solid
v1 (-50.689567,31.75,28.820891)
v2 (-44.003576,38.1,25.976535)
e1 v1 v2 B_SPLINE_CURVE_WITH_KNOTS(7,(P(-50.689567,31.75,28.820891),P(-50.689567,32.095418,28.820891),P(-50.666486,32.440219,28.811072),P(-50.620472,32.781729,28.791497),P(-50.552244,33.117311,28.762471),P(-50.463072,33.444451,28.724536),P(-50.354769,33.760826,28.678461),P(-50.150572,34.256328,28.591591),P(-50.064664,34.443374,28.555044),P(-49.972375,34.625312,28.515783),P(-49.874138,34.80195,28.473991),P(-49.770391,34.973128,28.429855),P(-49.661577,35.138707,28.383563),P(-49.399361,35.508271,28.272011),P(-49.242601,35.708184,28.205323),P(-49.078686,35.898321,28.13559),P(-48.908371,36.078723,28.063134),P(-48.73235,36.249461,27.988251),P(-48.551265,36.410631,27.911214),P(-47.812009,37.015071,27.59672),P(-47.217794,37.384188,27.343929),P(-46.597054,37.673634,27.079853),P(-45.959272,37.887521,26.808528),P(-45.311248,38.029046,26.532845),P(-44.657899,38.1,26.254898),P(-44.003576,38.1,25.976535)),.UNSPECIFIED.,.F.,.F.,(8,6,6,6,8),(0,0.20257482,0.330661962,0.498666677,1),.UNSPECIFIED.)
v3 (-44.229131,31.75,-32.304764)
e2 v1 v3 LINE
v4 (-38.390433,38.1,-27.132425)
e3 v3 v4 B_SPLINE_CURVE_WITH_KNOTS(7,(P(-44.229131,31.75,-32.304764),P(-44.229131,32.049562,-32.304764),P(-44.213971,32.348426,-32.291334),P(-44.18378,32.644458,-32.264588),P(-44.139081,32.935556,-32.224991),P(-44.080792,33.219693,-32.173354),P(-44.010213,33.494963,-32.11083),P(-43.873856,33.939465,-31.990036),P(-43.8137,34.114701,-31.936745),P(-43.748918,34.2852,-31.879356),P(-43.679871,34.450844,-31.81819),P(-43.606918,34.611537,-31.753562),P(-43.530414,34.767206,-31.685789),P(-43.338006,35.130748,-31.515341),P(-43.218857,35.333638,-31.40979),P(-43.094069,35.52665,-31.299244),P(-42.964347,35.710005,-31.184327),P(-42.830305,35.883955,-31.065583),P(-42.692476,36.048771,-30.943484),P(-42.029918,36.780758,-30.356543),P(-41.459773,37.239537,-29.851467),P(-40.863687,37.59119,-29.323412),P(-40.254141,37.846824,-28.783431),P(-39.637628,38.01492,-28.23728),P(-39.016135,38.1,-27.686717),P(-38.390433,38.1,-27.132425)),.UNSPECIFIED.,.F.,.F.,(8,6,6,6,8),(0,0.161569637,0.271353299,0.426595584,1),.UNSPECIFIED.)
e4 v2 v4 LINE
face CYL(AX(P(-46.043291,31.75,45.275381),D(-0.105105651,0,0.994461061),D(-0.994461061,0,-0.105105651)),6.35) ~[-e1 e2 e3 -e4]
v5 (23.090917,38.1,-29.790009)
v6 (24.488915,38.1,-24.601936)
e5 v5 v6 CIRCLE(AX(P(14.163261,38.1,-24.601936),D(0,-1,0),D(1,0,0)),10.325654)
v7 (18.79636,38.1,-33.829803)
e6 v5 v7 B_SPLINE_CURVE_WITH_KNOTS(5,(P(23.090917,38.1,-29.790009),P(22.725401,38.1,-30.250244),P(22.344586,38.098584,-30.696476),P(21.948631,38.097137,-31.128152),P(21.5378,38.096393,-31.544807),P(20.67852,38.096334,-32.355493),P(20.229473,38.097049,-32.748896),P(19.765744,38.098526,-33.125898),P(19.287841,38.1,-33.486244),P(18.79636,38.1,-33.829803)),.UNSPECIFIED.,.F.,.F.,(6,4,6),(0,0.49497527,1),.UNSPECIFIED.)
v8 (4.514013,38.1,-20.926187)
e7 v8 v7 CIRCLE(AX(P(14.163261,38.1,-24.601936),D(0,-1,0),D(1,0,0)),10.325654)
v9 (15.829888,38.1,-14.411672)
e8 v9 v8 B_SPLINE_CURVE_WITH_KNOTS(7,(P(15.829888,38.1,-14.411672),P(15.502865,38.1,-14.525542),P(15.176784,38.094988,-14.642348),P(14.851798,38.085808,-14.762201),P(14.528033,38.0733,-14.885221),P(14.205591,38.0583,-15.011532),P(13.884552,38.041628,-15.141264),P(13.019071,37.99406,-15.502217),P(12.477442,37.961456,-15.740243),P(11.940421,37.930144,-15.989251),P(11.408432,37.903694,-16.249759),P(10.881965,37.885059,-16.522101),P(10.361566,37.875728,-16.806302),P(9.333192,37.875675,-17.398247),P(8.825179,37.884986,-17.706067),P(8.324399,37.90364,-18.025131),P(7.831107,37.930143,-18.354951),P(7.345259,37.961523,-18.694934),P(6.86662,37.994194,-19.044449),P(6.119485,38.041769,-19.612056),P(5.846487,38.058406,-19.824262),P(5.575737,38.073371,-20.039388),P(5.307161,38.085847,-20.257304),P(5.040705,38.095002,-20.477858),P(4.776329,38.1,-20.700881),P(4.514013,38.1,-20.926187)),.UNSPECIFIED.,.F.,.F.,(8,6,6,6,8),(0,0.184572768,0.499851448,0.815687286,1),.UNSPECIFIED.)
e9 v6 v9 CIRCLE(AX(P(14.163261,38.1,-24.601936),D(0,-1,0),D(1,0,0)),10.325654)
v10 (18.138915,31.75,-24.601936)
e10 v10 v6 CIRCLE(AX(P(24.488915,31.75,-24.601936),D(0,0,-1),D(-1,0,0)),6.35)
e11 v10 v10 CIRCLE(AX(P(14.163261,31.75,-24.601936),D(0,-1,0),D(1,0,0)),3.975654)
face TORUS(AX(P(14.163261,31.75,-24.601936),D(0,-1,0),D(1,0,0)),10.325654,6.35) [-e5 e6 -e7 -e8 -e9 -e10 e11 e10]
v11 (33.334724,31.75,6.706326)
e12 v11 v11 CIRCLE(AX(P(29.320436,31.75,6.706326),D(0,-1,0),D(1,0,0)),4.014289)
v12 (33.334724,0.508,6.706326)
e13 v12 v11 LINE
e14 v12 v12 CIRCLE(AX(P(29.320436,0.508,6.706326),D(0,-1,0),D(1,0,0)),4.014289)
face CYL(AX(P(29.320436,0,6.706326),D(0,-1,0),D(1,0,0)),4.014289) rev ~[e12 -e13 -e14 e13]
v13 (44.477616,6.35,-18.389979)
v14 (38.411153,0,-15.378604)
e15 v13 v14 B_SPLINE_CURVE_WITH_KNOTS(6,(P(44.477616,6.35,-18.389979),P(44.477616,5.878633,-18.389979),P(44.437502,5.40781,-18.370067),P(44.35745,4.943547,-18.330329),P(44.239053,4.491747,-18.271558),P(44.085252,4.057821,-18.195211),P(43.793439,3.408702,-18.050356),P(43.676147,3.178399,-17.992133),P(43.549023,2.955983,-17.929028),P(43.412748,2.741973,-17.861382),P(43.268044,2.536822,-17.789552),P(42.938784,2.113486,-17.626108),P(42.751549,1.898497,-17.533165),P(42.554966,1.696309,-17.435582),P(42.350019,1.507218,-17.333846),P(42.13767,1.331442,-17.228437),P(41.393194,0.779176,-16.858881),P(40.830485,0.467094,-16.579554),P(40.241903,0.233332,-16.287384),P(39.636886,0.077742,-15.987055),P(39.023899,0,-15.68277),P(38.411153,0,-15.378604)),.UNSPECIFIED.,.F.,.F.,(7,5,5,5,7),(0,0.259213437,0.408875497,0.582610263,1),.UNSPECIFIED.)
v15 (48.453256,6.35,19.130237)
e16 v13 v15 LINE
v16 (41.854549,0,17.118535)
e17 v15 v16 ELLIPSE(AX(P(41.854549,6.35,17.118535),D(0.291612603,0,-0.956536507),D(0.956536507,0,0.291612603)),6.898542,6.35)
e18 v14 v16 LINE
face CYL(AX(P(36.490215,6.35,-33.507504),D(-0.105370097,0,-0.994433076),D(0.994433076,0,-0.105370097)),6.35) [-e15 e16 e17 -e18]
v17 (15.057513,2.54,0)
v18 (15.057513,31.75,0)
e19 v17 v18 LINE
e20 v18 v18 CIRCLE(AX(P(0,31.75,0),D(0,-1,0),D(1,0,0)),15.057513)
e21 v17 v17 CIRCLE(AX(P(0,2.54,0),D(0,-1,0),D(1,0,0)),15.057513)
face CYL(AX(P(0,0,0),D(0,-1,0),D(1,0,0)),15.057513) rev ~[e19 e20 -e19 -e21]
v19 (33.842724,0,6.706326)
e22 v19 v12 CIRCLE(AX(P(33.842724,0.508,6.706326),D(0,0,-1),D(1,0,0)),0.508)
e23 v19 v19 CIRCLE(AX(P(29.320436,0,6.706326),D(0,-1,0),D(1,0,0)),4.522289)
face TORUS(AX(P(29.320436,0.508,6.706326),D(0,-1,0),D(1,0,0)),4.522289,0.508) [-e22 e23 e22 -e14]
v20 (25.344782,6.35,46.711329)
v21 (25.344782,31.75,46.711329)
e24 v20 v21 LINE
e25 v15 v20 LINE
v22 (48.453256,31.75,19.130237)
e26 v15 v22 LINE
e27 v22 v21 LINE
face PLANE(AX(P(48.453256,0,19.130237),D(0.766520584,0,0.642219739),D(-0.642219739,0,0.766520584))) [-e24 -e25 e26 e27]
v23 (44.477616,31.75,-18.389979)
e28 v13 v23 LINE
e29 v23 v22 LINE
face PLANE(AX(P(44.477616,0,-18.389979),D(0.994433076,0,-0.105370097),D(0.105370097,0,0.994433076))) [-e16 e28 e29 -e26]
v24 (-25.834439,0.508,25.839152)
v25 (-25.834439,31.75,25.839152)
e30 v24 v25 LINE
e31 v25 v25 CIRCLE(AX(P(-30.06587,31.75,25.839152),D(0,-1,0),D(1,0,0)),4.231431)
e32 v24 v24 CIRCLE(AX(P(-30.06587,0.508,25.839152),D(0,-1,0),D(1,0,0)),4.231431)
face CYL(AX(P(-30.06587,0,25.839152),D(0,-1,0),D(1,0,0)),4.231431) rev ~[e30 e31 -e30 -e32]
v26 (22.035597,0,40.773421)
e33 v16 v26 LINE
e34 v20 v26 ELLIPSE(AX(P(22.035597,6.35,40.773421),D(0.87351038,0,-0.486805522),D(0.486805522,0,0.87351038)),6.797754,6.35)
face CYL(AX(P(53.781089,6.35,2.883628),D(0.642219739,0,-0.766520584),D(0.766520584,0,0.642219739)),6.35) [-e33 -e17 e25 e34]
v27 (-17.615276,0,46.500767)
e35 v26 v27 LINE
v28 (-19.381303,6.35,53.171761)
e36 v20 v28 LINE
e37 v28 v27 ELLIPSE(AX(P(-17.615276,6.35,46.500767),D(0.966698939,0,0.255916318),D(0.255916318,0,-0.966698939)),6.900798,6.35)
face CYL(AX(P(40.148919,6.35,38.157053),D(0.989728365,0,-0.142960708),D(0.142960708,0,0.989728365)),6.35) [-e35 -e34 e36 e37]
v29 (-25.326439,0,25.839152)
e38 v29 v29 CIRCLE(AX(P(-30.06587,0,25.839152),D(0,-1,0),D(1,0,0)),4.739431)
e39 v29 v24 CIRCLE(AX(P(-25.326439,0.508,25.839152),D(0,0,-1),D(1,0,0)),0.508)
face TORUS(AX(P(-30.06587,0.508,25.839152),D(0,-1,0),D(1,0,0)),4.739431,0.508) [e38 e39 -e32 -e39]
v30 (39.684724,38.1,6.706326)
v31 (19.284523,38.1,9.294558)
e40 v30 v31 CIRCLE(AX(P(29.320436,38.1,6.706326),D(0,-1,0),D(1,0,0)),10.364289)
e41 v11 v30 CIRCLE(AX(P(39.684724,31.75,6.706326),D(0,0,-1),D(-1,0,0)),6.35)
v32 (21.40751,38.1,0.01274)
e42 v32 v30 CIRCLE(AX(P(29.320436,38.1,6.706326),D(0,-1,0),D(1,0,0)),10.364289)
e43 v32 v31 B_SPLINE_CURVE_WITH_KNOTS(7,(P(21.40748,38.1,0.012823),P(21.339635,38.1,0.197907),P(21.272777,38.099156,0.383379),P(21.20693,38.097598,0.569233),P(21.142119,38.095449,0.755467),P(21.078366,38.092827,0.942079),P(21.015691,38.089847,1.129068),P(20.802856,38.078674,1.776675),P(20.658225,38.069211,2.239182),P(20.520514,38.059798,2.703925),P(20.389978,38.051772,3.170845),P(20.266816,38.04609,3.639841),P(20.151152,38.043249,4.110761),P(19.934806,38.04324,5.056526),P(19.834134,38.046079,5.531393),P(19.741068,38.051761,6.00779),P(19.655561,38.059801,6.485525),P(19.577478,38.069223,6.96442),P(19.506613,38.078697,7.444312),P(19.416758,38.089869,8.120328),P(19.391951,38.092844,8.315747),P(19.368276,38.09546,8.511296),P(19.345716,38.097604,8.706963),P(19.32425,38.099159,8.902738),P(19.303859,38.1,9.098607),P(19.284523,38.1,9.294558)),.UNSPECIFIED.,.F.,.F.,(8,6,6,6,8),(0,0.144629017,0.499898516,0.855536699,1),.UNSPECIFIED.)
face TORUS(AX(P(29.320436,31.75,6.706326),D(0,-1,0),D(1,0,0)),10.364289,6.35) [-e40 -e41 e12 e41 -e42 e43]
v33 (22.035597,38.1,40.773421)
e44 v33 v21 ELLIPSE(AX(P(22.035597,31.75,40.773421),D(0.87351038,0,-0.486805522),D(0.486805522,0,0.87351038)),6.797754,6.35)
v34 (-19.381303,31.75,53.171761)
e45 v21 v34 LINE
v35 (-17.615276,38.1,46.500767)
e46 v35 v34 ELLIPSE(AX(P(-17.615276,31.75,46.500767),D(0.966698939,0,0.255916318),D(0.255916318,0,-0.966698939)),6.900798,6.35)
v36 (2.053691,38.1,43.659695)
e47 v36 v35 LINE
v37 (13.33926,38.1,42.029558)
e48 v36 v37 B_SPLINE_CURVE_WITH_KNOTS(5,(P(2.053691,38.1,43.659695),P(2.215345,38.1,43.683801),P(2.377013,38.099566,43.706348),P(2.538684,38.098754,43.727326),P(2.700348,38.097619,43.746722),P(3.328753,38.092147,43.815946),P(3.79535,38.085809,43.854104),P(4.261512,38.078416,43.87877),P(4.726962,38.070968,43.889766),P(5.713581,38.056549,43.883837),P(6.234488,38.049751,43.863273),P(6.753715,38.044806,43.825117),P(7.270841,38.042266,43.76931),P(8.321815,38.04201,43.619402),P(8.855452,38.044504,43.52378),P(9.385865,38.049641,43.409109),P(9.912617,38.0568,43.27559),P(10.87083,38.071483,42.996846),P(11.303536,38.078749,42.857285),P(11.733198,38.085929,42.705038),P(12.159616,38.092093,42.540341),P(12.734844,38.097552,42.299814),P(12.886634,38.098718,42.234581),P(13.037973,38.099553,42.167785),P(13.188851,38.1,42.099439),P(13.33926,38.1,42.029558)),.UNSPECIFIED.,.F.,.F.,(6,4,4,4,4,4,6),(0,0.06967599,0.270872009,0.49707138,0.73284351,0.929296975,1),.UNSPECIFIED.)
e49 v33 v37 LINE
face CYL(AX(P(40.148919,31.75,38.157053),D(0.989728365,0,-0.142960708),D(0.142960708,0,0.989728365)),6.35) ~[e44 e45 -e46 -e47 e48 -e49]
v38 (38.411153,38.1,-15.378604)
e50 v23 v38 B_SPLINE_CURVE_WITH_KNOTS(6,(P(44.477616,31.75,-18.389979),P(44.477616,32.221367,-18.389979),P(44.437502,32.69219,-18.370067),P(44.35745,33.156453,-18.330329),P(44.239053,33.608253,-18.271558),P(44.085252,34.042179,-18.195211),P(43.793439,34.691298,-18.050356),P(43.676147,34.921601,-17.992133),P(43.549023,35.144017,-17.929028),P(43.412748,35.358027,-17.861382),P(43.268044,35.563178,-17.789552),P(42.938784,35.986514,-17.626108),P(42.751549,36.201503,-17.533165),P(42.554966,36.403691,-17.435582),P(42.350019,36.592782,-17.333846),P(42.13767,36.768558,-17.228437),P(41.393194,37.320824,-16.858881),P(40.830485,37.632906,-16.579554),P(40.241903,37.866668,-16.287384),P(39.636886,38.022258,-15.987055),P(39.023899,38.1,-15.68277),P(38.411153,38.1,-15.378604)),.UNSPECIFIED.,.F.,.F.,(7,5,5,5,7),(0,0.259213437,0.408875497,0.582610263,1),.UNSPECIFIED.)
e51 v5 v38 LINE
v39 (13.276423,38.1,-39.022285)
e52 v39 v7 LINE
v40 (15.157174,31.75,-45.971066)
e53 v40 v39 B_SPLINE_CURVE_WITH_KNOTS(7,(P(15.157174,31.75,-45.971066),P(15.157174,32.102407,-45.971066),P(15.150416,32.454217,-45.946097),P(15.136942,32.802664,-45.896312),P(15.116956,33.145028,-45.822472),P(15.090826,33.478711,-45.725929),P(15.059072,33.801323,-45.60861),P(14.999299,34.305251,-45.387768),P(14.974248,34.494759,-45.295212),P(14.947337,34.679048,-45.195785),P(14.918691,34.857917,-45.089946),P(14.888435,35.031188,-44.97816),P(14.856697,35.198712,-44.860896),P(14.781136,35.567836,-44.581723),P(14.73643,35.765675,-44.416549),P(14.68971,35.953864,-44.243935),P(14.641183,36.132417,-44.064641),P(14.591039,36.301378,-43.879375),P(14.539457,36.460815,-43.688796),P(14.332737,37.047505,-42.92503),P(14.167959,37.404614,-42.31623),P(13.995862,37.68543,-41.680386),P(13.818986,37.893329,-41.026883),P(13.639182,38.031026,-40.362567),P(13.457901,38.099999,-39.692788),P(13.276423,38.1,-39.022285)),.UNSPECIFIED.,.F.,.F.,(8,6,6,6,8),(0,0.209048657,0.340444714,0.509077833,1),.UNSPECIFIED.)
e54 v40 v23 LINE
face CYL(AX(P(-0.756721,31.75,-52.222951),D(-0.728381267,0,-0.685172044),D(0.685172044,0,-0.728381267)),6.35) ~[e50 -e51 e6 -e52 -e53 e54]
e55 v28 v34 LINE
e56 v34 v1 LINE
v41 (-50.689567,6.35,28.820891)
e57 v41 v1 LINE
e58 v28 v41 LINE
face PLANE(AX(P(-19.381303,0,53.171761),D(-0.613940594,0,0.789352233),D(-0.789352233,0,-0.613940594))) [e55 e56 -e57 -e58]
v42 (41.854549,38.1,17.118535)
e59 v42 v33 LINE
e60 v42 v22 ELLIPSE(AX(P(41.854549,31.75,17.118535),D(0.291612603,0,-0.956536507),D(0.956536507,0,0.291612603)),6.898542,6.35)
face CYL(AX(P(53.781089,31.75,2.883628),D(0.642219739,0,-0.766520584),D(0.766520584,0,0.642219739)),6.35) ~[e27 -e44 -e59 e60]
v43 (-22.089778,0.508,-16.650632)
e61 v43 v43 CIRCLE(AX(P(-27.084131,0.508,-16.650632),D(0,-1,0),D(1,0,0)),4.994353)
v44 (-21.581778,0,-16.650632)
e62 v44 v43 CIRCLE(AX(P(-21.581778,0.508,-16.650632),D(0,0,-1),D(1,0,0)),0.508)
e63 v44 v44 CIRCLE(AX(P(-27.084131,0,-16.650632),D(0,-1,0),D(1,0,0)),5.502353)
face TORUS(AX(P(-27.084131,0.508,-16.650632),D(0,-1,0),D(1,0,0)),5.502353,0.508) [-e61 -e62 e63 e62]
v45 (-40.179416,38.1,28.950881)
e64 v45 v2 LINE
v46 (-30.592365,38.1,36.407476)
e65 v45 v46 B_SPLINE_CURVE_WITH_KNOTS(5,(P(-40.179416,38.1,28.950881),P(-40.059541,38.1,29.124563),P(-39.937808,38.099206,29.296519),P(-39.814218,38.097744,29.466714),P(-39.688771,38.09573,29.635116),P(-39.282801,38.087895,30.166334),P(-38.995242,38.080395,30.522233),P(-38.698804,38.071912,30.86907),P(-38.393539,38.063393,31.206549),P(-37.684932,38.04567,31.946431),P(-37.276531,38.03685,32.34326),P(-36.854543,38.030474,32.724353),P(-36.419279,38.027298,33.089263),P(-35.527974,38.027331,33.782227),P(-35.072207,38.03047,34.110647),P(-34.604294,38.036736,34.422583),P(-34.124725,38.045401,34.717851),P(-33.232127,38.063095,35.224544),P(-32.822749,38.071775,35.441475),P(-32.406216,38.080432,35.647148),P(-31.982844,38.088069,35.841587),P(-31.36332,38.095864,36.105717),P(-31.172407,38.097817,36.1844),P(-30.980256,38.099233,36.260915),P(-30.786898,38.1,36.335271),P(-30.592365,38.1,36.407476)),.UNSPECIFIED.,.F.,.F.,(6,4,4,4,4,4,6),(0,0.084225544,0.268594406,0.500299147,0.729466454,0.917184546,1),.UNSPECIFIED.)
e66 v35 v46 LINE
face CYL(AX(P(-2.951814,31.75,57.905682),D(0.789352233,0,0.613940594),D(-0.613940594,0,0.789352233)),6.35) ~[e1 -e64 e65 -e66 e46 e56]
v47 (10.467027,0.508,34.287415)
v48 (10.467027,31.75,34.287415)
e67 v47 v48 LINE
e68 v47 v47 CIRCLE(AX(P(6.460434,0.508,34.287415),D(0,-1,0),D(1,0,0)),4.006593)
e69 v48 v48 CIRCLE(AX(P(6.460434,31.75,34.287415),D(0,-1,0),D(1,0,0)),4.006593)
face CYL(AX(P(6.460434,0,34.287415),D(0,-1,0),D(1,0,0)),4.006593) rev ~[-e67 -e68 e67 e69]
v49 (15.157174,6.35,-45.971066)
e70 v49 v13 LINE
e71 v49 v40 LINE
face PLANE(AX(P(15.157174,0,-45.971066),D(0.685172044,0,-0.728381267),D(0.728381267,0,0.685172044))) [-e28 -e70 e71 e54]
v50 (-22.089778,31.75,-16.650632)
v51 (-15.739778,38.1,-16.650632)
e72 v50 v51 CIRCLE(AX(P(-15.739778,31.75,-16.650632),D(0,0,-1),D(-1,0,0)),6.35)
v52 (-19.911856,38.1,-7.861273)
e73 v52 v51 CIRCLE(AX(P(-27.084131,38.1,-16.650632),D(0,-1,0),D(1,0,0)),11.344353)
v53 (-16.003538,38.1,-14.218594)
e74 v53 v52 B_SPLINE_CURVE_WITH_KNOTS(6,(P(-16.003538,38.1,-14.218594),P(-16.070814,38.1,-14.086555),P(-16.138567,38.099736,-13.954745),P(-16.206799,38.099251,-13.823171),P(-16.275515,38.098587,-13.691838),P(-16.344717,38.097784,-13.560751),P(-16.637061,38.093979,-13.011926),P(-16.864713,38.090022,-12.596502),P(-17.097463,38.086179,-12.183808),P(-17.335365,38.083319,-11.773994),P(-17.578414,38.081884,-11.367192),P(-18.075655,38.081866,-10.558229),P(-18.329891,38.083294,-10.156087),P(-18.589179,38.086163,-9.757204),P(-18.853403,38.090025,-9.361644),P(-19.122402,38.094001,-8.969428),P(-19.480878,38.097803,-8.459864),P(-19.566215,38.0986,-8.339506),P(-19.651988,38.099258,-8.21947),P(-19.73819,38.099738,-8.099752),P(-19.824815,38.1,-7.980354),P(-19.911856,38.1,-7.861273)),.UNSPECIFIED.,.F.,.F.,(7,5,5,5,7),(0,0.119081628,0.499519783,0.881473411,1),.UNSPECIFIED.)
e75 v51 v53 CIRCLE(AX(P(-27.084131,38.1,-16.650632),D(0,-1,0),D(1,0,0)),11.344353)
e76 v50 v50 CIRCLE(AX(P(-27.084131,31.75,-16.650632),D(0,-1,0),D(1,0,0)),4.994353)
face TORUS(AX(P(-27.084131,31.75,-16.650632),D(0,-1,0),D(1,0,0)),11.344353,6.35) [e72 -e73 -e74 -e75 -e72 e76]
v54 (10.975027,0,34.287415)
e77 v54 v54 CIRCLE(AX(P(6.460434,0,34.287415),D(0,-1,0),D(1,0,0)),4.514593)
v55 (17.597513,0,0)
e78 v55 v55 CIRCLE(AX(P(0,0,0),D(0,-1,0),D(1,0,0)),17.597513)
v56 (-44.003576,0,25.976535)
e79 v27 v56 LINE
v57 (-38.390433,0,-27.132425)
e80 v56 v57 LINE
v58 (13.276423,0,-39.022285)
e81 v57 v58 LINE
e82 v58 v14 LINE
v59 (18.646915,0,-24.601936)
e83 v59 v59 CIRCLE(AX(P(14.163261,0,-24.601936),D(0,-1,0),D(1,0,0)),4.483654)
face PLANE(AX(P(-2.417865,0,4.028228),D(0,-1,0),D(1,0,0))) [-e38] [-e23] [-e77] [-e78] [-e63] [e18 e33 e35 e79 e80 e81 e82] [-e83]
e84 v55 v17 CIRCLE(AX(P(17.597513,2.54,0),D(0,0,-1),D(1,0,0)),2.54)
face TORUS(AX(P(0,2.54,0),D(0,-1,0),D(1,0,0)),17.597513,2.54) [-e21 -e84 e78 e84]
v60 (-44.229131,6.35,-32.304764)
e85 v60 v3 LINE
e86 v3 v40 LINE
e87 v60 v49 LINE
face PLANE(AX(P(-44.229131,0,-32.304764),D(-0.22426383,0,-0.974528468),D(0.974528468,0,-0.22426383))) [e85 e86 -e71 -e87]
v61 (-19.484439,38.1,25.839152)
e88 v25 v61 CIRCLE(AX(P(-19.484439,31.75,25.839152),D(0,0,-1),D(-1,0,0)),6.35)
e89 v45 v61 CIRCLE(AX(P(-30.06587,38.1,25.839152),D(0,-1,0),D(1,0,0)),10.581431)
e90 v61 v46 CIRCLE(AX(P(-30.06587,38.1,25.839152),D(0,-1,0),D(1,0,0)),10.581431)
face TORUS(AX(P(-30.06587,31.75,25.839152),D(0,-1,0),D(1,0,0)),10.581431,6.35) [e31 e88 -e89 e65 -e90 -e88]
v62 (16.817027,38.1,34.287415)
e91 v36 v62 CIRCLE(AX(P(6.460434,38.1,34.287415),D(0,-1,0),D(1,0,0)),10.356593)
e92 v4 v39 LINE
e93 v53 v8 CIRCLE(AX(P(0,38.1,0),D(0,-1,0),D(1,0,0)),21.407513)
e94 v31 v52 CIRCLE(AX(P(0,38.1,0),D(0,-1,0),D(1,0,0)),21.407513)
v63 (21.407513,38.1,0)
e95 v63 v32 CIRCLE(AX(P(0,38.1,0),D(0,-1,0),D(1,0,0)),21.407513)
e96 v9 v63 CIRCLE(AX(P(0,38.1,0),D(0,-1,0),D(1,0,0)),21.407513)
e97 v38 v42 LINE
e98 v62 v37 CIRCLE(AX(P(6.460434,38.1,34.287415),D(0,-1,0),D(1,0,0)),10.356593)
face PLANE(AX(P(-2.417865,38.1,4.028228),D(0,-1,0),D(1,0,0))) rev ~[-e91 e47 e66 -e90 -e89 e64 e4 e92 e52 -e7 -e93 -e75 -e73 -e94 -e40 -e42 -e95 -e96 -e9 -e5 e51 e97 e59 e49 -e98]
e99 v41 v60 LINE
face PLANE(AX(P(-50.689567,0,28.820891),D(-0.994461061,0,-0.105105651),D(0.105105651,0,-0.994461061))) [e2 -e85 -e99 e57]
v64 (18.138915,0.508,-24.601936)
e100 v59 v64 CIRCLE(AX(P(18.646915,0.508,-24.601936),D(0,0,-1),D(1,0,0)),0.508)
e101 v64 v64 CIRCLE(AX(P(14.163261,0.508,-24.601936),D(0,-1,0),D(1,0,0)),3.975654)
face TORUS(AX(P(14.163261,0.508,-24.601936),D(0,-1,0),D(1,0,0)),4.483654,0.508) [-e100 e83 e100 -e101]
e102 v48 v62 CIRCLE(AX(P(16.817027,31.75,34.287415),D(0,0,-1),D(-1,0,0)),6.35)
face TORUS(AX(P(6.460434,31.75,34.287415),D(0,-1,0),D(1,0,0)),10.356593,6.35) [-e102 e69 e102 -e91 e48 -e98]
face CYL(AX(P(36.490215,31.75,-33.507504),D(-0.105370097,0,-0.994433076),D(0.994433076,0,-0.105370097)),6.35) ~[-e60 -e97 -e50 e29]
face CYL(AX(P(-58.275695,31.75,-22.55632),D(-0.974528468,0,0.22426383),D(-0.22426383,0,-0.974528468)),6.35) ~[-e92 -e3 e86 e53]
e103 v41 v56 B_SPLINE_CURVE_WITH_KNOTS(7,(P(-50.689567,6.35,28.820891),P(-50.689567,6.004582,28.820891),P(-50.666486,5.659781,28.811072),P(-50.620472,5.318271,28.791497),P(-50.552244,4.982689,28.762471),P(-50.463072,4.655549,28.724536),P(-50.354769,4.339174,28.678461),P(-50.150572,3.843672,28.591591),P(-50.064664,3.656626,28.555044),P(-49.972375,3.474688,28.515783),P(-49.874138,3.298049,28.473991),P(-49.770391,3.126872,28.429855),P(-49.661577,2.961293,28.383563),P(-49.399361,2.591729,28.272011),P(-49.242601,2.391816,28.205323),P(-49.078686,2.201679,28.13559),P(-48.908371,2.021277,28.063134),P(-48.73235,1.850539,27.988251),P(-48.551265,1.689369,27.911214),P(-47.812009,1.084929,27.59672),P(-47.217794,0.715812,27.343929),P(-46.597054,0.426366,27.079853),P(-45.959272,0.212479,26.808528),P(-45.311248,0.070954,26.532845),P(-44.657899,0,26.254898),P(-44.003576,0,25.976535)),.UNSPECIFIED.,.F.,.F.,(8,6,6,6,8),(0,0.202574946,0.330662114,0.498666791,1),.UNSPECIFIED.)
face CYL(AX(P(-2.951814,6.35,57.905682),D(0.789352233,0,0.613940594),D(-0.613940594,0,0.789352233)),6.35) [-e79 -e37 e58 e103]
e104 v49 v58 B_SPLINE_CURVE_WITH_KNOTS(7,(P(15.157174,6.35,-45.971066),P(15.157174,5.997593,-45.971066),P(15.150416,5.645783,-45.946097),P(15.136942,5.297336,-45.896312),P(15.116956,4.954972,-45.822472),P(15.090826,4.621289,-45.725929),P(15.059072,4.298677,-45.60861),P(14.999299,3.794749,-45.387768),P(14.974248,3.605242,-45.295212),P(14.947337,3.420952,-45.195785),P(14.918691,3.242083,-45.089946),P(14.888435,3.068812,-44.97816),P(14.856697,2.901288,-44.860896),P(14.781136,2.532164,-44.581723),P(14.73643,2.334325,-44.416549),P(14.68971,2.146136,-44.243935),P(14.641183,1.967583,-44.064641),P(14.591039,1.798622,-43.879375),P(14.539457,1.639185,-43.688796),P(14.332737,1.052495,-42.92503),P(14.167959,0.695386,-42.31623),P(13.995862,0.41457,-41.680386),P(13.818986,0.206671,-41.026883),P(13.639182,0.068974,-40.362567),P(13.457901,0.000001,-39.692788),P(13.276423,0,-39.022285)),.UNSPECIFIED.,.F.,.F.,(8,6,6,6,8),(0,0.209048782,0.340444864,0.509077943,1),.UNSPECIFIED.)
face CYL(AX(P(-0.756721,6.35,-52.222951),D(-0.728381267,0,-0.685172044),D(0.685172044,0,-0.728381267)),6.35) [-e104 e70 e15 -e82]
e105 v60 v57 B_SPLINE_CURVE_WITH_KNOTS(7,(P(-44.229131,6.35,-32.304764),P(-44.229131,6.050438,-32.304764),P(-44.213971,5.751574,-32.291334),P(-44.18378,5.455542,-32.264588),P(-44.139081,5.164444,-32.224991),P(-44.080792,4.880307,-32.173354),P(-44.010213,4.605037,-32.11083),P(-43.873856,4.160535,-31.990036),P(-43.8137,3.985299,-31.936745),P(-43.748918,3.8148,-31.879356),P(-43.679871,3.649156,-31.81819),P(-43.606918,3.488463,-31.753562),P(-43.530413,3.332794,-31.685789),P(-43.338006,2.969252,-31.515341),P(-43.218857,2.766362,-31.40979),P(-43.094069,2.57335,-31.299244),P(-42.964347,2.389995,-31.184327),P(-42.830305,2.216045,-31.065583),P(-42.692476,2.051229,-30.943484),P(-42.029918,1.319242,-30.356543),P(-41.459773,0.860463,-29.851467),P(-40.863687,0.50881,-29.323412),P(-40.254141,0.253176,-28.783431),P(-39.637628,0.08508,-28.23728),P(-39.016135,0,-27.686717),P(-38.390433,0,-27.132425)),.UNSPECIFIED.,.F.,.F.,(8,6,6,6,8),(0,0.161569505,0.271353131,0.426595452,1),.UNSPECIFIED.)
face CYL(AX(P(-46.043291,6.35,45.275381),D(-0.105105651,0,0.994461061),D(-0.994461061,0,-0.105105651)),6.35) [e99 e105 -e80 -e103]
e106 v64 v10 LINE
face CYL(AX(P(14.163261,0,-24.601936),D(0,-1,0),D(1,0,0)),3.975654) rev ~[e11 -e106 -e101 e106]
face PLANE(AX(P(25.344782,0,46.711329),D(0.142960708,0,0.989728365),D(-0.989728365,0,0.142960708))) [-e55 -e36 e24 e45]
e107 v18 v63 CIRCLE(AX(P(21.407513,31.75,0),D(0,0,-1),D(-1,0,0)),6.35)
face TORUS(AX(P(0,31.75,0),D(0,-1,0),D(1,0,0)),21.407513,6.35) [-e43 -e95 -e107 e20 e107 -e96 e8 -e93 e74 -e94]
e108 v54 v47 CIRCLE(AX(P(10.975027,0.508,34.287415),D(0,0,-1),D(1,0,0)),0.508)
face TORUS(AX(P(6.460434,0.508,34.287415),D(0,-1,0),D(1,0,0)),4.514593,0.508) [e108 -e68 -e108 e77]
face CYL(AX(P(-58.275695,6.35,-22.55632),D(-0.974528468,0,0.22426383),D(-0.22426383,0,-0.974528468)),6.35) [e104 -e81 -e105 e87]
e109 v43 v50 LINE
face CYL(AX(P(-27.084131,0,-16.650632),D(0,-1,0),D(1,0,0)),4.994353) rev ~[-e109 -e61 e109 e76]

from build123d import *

# Parameters (mm, degrees)
F0_R         = 4.994353159
F0_R_2       = 3.9756540209
F0_R_3       = 15.0575134539
F0_R_4       = 4.2314308146
F0_R_5       = 4.0142888821
F0_R_6       = 4.0065925918
F1_DEPTH     = 38.1
F2_T1_DEPTH  = 76.9402628143
F2_T3_DEPTH  = 67.7321934705
F2_T5_DEPTH  = 69.4802582589
F2_T7_DEPTH  = 72.0042494327
F2_T9_DEPTH  = 92.6885025387
F2_T11_DEPTH = 93.2161117618
F2_T13_DEPTH = 71.4132355611
F3_R         = 2.54
F4_R         = 0.508


# Not quite as in the source:
# - a fillet or chamfer that OpenCascade refuses, or shapes differently, is made with other operations: its cross-section is extruded or revolved along the edge and cut away or added


with BuildPart() as f1:
    # F0 (on Front) → F1 (new body)
    with BuildSketch(Plane.XZ):
        Polygon((-50.6895668805, 28.8208909333), (-44.229131192, -32.3047637939), (15.157174319, -45.9710657597), (44.4776155055, -18.3899793774), (48.4532564878, 19.1302374005), (25.3447815776, 46.7113293707), (-19.3813033402, 53.1717613339), align=None)
        with Locations((-27.0841307938, -16.6506320238)):
            Circle(F0_R, mode=Mode.SUBTRACT)
        with Locations((14.1632612795, -24.6019363403)):
            Circle(F0_R_2, mode=Mode.SUBTRACT)
        Circle(F0_R_3, mode=Mode.SUBTRACT)
        with Locations((-30.0658699125, 25.8391518146)):
            Circle(F0_R_4, mode=Mode.SUBTRACT)
        with Locations((29.3204355985, 6.706325803)):
            Circle(F0_R_5, mode=Mode.SUBTRACT)
        with Locations((6.4604342915, 34.2874154449)):
            Circle(F0_R_6, mode=Mode.SUBTRACT)
    extrude(amount=-F1_DEPTH)

    # F2: fillet of radius 6.35 on 20 edges, made by hand

    # F2_s2 → F2_t1 (cut)
    with BuildSketch(Plane(origin=(33.9294367843, 0, -4.9009167312), x_dir=(0, 1, 0), z_dir=(-0.9897283647, 0, 0.1429607079))):
        with BuildLine():
            ThreePointArc((6.35, -49.8548355499), (1.8598719395, -47.9949636104), (0, -43.5048355499))
            Line((0, -43.5048355499), (0, -49.8548355499))
            Line((0, -49.8548355499), (6.35, -49.8548355499))
        make_face()
        with BuildLine():
            ThreePointArc((31.75, -49.8548355499), (36.2401280605, -47.9949636104), (38.1, -43.5048355499))
            Line((38.1, -43.5048355499), (38.1, -49.8548355499))
            Line((38.1, -49.8548355499), (31.75, -49.8548355499))
        make_face()
    extrude(amount=F2_T1_DEPTH, mode=Mode.SUBTRACT)

    # F2_s4 → F2_t3 (cut)
    with BuildSketch(Plane(origin=(20.7622686455, 0, -24.780780352), x_dir=(0, 1, 0), z_dir=(-0.6422197393, 0, 0.7665205845))):
        with BuildLine():
            ThreePointArc((6.35, -49.4262345597), (1.8598719395, -47.5663626202), (0, -43.0762345597))
            Line((0, -43.0762345597), (0, -49.4262345597))
            Line((0, -49.4262345597), (6.35, -49.4262345597))
        make_face()
        with BuildLine():
            ThreePointArc((31.75, -49.4262345597), (36.2401280605, -47.5663626202), (38.1, -43.0762345597))
            Line((38.1, -43.0762345597), (38.1, -49.4262345597))
            Line((38.1, -49.4262345597), (31.75, -49.4262345597))
        make_face()
    extrude(amount=F2_T3_DEPTH, mode=Mode.SUBTRACT)

    # F2_s6 → F2_t5 (cut)
    with BuildSketch(Plane(origin=(-3.1058882585, 0, -29.3119024738), x_dir=(0, 1, 0), z_dir=(0.1053700973, 0, 0.994433076))):
        with BuildLine():
            ThreePointArc((6.35, -46.167765915), (1.8598719395, -44.3078939755), (0, -39.817765915))
            Line((0, -39.817765915), (0, -46.167765915))
            Line((0, -46.167765915), (6.35, -46.167765915))
        make_face()
        with BuildLine():
            ThreePointArc((31.75, -46.167765915), (36.2401280605, -44.3078939755), (38.1, -39.817765915))
            Line((38.1, -39.817765915), (38.1, -46.167765915))
            Line((38.1, -46.167765915), (31.75, -46.167765915))
        make_face()
    extrude(amount=F2_T5_DEPTH, mode=Mode.SUBTRACT)

    # F2_s8 → F2_t7 (cut)
    with BuildSketch(Plane(origin=(-26.4641944584, 0, -24.8942786623), x_dir=(0, 1, 0), z_dir=(0.7283812666, 0, 0.6851720445))):
        with BuildLine():
            ThreePointArc((6.35, -43.8697352198), (1.8598719395, -42.0098632804), (0, -37.5197352198))
            Line((0, -37.5197352198), (0, -43.8697352198))
            Line((0, -43.8697352198), (6.35, -43.8697352198))
        make_face()
        with BuildLine():
            ThreePointArc((31.75, -43.8697352198), (36.2401280605, -42.0098632804), (38.1, -37.5197352198))
            Line((38.1, -37.5197352198), (38.1, -43.8697352198))
            Line((38.1, -43.8697352198), (31.75, -43.8697352198))
        make_face()
    extrude(amount=F2_T7_DEPTH, mode=Mode.SUBTRACT)

    # F2_s10 → F2_t9 (cut)
    with BuildSketch(Plane(origin=(-50.4150448083, 0, 11.6017863047), x_dir=(0, 1, 0), z_dir=(0.9745284678, 0, -0.2242638299))):
        with BuildLine():
            ThreePointArc((6.35, -41.4009063166), (1.8598719395, -39.5410343771), (0, -35.0509063166))
            Line((0, -35.0509063166), (0, -41.4009063166))
            Line((0, -41.4009063166), (6.35, -41.4009063166))
        make_face()
        with BuildLine():
            ThreePointArc((31.75, -41.4009063166), (36.2401280605, -39.5410343771), (38.1, -35.0509063166))
            Line((38.1, -35.0509063166), (38.1, -41.4009063166))
            Line((38.1, -41.4009063166), (31.75, -41.4009063166))
        make_face()
    extrude(amount=F2_T9_DEPTH, mode=Mode.SUBTRACT)

    # F2_s12 → F2_t11 (cut)
    with BuildSketch(Plane(origin=(-5.2409896197, 0, 49.5878199815), x_dir=(0, 1, 0), z_dir=(0.105105651, 0, -0.9944610611))):
        with BuildLine():
            ThreePointArc((6.35, -47.3795619663), (1.8598719395, -45.5196900269), (0, -41.0295619663))
            Line((0, -41.0295619663), (0, -47.3795619663))
            Line((0, -47.3795619663), (6.35, -47.3795619663))
        make_face()
        with BuildLine():
            ThreePointArc((31.75, -47.3795619663), (36.2401280605, -45.5196900269), (38.1, -41.0295619663))
            Line((38.1, -41.0295619663), (38.1, -47.3795619663))
            Line((38.1, -47.3795619663), (31.75, -47.3795619663))
        make_face()
    extrude(amount=F2_T11_DEPTH, mode=Mode.SUBTRACT)

    # F2_s14 → F2_t13 (cut)
    with BuildSketch(Plane(origin=(26.2227766231, 0, 20.395491889), x_dir=(0, 1, 0), z_dir=(-0.7893522325, 0, -0.613940594))):
        with BuildLine():
            ThreePointArc((6.35, -53.8702174028), (1.8598719395, -52.0103454633), (0, -47.5202174028))
            Line((0, -47.5202174028), (0, -53.8702174028))
            Line((0, -53.8702174028), (6.35, -53.8702174028))
        make_face()
        with BuildLine():
            ThreePointArc((31.75, -53.8702174028), (36.2401280605, -52.0103454633), (38.1, -47.5202174028))
            Line((38.1, -47.5202174028), (38.1, -53.8702174028))
            Line((38.1, -53.8702174028), (31.75, -53.8702174028))
        make_face()
    extrude(amount=F2_T13_DEPTH, mode=Mode.SUBTRACT)

    # F2_s15 → F2_t16 (revolve, cut)
    with BuildSketch(Plane.XY.offset(-16.6506320238)):
        with BuildLine():
            ThreePointArc((-22.0897776348, 31.75), (-20.2299056954, 36.2401280605), (-15.7397776348, 38.1))
            Line((-15.7397776348, 38.1), (-22.0897776348, 38.1))
            Line((-22.0897776348, 38.1), (-22.0897776348, 31.75))
        make_face()
    revolve(axis=Axis((-27.0841307938, 38.1, -16.6506320238), (0, -1, 0)), mode=Mode.SUBTRACT)

    # F2_s17 → F2_t18 (revolve, cut)
    with BuildSketch(Plane.XY.offset(-24.6019363403)):
        with BuildLine():
            ThreePointArc((18.1389153004, 31.75), (19.9987872398, 36.2401280605), (24.4889153004, 38.1))
            Line((24.4889153004, 38.1), (18.1389153004, 38.1))
            Line((18.1389153004, 38.1), (18.1389153004, 31.75))
        make_face()
    revolve(axis=Axis((14.1632612795, 38.1, -24.6019363403), (0, -1, 0)), mode=Mode.SUBTRACT)

    # F2_s19 → F2_t20 (revolve, cut)
    with BuildSketch(Plane.XY):
        with BuildLine():
            ThreePointArc((15.0575134539, 31.75), (16.9173853934, 36.2401280605), (21.4075134539, 38.1))
            Line((21.4075134539, 38.1), (15.0575134539, 38.1))
            Line((15.0575134539, 38.1), (15.0575134539, 31.75))
        make_face()
    revolve(axis=Axis((0, 38.1, 0), (0, -1, 0)), mode=Mode.SUBTRACT)

    # F2_s21 → F2_t22 (revolve, cut)
    with BuildSketch(Plane.XY.offset(25.8391518146)):
        with BuildLine():
            ThreePointArc((-25.8344390979, 31.75), (-23.9745671584, 36.2401280605), (-19.4844390979, 38.1))
            Line((-19.4844390979, 38.1), (-25.8344390979, 38.1))
            Line((-25.8344390979, 38.1), (-25.8344390979, 31.75))
        make_face()
    revolve(axis=Axis((-30.0658699125, 38.1, 25.8391518146), (0, -1, 0)), mode=Mode.SUBTRACT)

    # F2_s23 → F2_t24 (revolve, cut)
    with BuildSketch(Plane.XY.offset(6.706325803)):
        with BuildLine():
            ThreePointArc((33.3347244806, 31.75), (35.1945964201, 36.2401280605), (39.6847244806, 38.1))
            Line((39.6847244806, 38.1), (33.3347244806, 38.1))
            Line((33.3347244806, 38.1), (33.3347244806, 31.75))
        make_face()
    revolve(axis=Axis((29.3204355985, 38.1, 6.706325803), (0, -1, 0)), mode=Mode.SUBTRACT)

    # F2_s25 → F2_t26 (revolve, cut)
    with BuildSketch(Plane.XY.offset(34.2874154449)):
        with BuildLine():
            ThreePointArc((10.4670268833, 31.75), (12.3268988228, 36.2401280605), (16.8170268833, 38.1))
            Line((16.8170268833, 38.1), (10.4670268833, 38.1))
            Line((10.4670268833, 38.1), (10.4670268833, 31.75))
        make_face()
    revolve(axis=Axis((6.4604342915, 38.1, 34.2874154449), (0, -1, 0)), mode=Mode.SUBTRACT)

    # F3
    f3_edges = [f1.edges().sort_by_distance(p)[0] for p in [
        (-15.057513, 0, 0),
        (-15.057513, 31.75, 0),
    ]]
    fillet(f3_edges, radius=F3_R)

    # F4
    f4_edges = [f1.edges().sort_by_distance(p)[0] for p in [
        (-34.297301, 0, 25.839152),
        (2.453842, 0, 34.287415),
        (25.306147, 0, 6.706326),
        (10.187607, 0, -24.601936),
        (-32.078484, 0, -16.650632),
    ]]
    fillet(f4_edges, radius=F4_R)


solid = f1.part
